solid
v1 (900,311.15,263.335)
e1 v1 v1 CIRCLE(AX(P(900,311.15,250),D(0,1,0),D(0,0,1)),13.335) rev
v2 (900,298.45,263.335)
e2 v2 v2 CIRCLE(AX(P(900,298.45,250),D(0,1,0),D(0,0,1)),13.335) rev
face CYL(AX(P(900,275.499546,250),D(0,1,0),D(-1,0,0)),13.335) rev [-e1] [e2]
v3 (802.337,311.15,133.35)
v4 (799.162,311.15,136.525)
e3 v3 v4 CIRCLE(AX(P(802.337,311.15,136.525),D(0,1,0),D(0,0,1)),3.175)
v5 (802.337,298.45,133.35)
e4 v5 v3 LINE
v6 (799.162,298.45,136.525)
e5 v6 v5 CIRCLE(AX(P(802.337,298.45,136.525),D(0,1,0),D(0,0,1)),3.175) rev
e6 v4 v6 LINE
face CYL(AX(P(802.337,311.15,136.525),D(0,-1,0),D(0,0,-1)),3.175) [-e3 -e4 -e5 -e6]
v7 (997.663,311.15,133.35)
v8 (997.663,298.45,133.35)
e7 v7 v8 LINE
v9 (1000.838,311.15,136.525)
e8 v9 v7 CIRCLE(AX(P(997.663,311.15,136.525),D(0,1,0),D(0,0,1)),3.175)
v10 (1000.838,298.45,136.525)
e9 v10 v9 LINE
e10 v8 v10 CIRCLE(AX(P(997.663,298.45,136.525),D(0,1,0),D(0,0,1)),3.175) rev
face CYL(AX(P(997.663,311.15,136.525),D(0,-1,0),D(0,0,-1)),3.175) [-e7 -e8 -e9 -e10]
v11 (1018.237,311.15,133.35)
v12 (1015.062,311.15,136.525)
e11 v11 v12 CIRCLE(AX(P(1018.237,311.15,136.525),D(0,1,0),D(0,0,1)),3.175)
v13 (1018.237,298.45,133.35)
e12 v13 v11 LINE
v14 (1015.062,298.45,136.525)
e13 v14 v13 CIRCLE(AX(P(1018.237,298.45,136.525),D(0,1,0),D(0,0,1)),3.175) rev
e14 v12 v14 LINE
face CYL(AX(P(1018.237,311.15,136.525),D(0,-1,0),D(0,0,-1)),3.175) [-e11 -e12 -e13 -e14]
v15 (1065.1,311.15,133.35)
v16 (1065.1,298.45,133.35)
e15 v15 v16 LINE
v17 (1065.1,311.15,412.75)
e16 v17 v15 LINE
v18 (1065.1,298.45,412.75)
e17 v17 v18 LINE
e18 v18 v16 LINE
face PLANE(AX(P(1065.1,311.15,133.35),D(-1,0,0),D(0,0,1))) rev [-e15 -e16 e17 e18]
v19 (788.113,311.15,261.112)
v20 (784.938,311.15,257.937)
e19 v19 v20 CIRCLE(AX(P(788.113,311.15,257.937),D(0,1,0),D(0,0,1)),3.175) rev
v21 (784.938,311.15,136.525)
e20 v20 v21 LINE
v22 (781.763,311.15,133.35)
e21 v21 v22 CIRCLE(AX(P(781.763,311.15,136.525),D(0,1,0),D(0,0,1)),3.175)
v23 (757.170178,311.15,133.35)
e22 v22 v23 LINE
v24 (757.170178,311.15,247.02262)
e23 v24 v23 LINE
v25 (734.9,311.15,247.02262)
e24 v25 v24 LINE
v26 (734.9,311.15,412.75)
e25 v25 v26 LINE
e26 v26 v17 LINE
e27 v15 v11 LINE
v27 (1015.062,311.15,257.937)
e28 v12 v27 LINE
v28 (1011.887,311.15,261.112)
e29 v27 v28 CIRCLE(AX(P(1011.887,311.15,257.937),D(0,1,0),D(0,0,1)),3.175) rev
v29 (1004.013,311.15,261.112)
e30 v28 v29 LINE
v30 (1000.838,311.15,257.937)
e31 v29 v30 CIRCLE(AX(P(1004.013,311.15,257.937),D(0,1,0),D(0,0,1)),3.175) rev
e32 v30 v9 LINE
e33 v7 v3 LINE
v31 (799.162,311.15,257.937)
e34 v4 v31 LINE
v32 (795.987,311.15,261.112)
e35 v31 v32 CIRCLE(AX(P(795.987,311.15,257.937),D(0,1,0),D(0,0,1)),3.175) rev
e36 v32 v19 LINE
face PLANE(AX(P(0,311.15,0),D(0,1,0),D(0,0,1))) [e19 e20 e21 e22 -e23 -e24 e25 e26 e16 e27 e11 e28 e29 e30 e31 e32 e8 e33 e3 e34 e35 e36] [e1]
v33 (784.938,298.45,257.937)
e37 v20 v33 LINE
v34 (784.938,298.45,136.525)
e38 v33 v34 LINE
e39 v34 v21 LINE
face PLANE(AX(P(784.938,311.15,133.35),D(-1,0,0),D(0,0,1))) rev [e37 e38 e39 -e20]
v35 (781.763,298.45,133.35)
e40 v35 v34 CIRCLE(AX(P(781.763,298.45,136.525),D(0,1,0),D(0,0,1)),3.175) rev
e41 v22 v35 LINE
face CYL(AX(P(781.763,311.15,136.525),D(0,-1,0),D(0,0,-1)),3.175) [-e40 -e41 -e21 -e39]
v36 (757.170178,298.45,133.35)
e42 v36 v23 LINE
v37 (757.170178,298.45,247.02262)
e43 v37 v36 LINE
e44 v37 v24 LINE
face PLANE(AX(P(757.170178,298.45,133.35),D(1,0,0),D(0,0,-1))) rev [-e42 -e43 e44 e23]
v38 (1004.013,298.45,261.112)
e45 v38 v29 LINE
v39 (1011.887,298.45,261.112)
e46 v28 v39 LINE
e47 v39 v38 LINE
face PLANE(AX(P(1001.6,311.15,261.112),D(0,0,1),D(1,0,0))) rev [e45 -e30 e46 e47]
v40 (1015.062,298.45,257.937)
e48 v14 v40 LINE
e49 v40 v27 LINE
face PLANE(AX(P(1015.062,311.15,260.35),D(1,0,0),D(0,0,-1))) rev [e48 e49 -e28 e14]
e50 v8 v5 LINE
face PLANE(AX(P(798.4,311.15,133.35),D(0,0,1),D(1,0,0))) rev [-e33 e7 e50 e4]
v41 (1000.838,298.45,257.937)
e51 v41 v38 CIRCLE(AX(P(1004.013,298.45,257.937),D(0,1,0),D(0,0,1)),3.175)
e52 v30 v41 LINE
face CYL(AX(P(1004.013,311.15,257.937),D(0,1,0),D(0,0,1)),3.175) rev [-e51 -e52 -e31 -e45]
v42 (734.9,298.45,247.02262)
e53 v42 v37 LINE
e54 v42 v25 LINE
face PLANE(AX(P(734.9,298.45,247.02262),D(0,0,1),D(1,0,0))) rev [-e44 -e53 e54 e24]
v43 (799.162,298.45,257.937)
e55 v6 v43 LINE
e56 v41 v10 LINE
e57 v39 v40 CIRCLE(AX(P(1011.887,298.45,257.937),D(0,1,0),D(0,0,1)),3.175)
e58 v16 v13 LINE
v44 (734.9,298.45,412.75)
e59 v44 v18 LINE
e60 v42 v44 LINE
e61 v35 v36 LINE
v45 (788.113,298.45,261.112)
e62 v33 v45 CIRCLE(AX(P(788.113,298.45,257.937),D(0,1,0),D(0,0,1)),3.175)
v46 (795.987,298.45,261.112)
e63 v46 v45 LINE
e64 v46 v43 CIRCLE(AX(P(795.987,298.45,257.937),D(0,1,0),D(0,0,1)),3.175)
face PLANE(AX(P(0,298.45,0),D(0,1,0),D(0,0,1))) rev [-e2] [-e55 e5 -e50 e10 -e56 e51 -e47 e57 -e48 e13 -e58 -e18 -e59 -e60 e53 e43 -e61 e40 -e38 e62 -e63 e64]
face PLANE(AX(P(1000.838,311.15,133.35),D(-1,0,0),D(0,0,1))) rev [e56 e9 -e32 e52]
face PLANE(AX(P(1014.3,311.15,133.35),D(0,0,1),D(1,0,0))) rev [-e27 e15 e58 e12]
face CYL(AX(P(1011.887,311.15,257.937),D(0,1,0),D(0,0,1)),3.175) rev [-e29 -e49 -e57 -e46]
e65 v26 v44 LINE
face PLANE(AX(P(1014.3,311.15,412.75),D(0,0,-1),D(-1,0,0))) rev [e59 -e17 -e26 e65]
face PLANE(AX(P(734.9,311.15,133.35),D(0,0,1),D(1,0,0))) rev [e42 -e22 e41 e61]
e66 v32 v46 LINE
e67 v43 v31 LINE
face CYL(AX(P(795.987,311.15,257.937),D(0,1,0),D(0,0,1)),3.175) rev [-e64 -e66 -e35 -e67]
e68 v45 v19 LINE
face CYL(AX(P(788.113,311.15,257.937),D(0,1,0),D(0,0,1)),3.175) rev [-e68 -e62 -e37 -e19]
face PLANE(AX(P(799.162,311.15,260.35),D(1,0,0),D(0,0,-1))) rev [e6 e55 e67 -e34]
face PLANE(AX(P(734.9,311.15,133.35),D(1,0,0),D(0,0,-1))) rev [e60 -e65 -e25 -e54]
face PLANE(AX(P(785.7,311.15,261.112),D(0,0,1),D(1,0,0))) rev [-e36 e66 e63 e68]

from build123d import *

# Parameters (mm, degrees)
BOSS_EXTRUDE1_DEPTH  = 6.35
CAVITY1_START        = 298.45
CAVITY1_OUTLINE_R    = 12.7
CAVITY1_DEPTH        = 12.7
CAVITY1_START_2      = 720.91620239
CAVITY1_2_DEPTH      = 22.43918751
SKETCH2_W            = 22.270177668
SKETCH2_H            = 113.672619585
CUT_EXTRUDE1_DEPTH   = 1143.349273427
MOVE_FACE_SLOTS_BY   = 0.762
MOVE_FACE_SLOTS_2_BY = 0.762
MOVE_FACE_SLOTS_3_BY = 0.762
MOVE_FACE_SLOTS_4_BY = 0.762
MOVE_FACE_SLOTS_5_BY = 0.762
MOVE_FACE_SLOTS_6_BY = 0.762
MOVE_FACE_HOLE_BY    = 0.635
SLOT_FILLET_R        = 3.175


# Read off the part's stored shape, not the designer's step: Cavity1
with BuildPart() as part:
    # Sketch1 → Boss-Extrude1 (new, symmetric)
    with BuildSketch(Plane(origin=(0, 304.8, 0), x_dir=(1, 0, 0), z_dir=(0, 1, 0))):
        Polygon((798.4, -133.35), (1001.6, -133.35), (1001.6, -260.35), (1014.3, -260.35), (1014.3, -133.35), (1065.1, -133.35), (1065.1, -412.75), (1014.3, -412.75), (1001.6, -412.75), (798.4, -412.75), (785.7, -412.75), (734.9, -412.75), (734.9, -133.35), (785.7, -133.35), (785.7, -260.35), (798.4, -260.35), align=None)
    extrude(amount=BOSS_EXTRUDE1_DEPTH, both=True)

    # Cavity1 outline → Cavity1 (cut)
    with BuildSketch(Plane(origin=(0, 0, 0), x_dir=(1, 0, 0), z_dir=(0, 1, 0)).offset(CAVITY1_START)):
        with Locations((900, -250)):
            Circle(CAVITY1_OUTLINE_R)
    extrude(amount=CAVITY1_DEPTH, mode=Mode.SUBTRACT)

    # Cavity1 2 outline → Cavity1 2 (cut)
    with BuildSketch(Plane(origin=(0, 0, 0), x_dir=(0.7149295353100829, -0.698752516444498, 0.02491345627949748), z_dir=(0.6991965099607612, 0.7144755512387372, -0.025474048378572107)).offset(CAVITY1_START_2)):
        with BuildLine():
            Line((312, -255.374549574), (314.076314529, -255.435688643))
            ThreePointArc((314.076314529, -255.435688643), (327.146171675, -242.424687318), (313.444242413, -230.081087528))
            Line((313.444242413, -230.081087528), (312, -230.195835843))
            Line((312, -230.195835843), (312, -255.374549574))
        make_face()
    extrude(amount=CAVITY1_2_DEPTH, mode=Mode.SUBTRACT)

    # Sketch2 → Cut-Extrude1 (cut, through all)
    with BuildSketch(Plane(origin=(0, 311.15, 0), x_dir=(1, 0, 0), z_dir=(0, 1, 0))):
        with Locations((746.035088834, -190.186309793)):
            Rectangle(SKETCH2_W, SKETCH2_H)
    extrude(amount=-CUT_EXTRUDE1_DEPTH, mode=Mode.SUBTRACT)

    # Move Face Slots: a face moved inward by 0.762
    extrude(part.faces().sort_by_distance((1014.3, 304.8, 196.85))[0], amount=MOVE_FACE_SLOTS_BY, dir=(1, 0, 0), mode=Mode.SUBTRACT)

    # Move Face Slots 2: a face moved inward by 0.762
    extrude(part.faces().sort_by_distance((1007.95, 304.8, 260.35))[0], amount=MOVE_FACE_SLOTS_2_BY, dir=(0, 0, 1), mode=Mode.SUBTRACT)

    # Move Face Slots 3: a face moved inward by 0.762
    extrude(part.faces().sort_by_distance((1001.6, 304.8, 196.85))[0], amount=MOVE_FACE_SLOTS_3_BY, dir=(-1, 0, 0), mode=Mode.SUBTRACT)

    # Move Face Slots 4: a face moved inward by 0.762
    extrude(part.faces().sort_by_distance((785.7, 304.8, 196.85))[0], amount=MOVE_FACE_SLOTS_4_BY, dir=(-1, 0, 0), mode=Mode.SUBTRACT)

    # Move Face Slots 5: a face moved inward by 0.762
    extrude(part.faces().sort_by_distance((792.05, 304.8, 260.35))[0], amount=MOVE_FACE_SLOTS_5_BY, dir=(0, 0, 1), mode=Mode.SUBTRACT)

    # Move Face Slots 6: a face moved inward by 0.762
    extrude(part.faces().sort_by_distance((798.4, 304.8, 196.85))[0], amount=MOVE_FACE_SLOTS_6_BY, dir=(1, 0, 0), mode=Mode.SUBTRACT)

    # Move Face Hole: a curved face moved inward by 0.635
    add(Solid.thicken(part.faces().sort_by_distance((887.3, 304.8, 250))[0], -MOVE_FACE_HOLE_BY), mode=Mode.SUBTRACT)

    # Slot Fillet
    slot_fillet_edges = [part.edges().sort_by_distance(p)[0] for p in [
        (1015.062, 304.8, 133.35),
        (1015.062, 304.8, 261.112),
        (1000.838, 304.8, 261.112),
        (1000.838, 304.8, 133.35),
        (799.162, 304.8, 133.35),
        (799.162, 304.8, 261.112),
        (784.938, 304.8, 261.112),
        (784.938, 304.8, 133.35),
    ]]
    fillet(slot_fillet_edges, radius=SLOT_FILLET_R)


solid = part.part
